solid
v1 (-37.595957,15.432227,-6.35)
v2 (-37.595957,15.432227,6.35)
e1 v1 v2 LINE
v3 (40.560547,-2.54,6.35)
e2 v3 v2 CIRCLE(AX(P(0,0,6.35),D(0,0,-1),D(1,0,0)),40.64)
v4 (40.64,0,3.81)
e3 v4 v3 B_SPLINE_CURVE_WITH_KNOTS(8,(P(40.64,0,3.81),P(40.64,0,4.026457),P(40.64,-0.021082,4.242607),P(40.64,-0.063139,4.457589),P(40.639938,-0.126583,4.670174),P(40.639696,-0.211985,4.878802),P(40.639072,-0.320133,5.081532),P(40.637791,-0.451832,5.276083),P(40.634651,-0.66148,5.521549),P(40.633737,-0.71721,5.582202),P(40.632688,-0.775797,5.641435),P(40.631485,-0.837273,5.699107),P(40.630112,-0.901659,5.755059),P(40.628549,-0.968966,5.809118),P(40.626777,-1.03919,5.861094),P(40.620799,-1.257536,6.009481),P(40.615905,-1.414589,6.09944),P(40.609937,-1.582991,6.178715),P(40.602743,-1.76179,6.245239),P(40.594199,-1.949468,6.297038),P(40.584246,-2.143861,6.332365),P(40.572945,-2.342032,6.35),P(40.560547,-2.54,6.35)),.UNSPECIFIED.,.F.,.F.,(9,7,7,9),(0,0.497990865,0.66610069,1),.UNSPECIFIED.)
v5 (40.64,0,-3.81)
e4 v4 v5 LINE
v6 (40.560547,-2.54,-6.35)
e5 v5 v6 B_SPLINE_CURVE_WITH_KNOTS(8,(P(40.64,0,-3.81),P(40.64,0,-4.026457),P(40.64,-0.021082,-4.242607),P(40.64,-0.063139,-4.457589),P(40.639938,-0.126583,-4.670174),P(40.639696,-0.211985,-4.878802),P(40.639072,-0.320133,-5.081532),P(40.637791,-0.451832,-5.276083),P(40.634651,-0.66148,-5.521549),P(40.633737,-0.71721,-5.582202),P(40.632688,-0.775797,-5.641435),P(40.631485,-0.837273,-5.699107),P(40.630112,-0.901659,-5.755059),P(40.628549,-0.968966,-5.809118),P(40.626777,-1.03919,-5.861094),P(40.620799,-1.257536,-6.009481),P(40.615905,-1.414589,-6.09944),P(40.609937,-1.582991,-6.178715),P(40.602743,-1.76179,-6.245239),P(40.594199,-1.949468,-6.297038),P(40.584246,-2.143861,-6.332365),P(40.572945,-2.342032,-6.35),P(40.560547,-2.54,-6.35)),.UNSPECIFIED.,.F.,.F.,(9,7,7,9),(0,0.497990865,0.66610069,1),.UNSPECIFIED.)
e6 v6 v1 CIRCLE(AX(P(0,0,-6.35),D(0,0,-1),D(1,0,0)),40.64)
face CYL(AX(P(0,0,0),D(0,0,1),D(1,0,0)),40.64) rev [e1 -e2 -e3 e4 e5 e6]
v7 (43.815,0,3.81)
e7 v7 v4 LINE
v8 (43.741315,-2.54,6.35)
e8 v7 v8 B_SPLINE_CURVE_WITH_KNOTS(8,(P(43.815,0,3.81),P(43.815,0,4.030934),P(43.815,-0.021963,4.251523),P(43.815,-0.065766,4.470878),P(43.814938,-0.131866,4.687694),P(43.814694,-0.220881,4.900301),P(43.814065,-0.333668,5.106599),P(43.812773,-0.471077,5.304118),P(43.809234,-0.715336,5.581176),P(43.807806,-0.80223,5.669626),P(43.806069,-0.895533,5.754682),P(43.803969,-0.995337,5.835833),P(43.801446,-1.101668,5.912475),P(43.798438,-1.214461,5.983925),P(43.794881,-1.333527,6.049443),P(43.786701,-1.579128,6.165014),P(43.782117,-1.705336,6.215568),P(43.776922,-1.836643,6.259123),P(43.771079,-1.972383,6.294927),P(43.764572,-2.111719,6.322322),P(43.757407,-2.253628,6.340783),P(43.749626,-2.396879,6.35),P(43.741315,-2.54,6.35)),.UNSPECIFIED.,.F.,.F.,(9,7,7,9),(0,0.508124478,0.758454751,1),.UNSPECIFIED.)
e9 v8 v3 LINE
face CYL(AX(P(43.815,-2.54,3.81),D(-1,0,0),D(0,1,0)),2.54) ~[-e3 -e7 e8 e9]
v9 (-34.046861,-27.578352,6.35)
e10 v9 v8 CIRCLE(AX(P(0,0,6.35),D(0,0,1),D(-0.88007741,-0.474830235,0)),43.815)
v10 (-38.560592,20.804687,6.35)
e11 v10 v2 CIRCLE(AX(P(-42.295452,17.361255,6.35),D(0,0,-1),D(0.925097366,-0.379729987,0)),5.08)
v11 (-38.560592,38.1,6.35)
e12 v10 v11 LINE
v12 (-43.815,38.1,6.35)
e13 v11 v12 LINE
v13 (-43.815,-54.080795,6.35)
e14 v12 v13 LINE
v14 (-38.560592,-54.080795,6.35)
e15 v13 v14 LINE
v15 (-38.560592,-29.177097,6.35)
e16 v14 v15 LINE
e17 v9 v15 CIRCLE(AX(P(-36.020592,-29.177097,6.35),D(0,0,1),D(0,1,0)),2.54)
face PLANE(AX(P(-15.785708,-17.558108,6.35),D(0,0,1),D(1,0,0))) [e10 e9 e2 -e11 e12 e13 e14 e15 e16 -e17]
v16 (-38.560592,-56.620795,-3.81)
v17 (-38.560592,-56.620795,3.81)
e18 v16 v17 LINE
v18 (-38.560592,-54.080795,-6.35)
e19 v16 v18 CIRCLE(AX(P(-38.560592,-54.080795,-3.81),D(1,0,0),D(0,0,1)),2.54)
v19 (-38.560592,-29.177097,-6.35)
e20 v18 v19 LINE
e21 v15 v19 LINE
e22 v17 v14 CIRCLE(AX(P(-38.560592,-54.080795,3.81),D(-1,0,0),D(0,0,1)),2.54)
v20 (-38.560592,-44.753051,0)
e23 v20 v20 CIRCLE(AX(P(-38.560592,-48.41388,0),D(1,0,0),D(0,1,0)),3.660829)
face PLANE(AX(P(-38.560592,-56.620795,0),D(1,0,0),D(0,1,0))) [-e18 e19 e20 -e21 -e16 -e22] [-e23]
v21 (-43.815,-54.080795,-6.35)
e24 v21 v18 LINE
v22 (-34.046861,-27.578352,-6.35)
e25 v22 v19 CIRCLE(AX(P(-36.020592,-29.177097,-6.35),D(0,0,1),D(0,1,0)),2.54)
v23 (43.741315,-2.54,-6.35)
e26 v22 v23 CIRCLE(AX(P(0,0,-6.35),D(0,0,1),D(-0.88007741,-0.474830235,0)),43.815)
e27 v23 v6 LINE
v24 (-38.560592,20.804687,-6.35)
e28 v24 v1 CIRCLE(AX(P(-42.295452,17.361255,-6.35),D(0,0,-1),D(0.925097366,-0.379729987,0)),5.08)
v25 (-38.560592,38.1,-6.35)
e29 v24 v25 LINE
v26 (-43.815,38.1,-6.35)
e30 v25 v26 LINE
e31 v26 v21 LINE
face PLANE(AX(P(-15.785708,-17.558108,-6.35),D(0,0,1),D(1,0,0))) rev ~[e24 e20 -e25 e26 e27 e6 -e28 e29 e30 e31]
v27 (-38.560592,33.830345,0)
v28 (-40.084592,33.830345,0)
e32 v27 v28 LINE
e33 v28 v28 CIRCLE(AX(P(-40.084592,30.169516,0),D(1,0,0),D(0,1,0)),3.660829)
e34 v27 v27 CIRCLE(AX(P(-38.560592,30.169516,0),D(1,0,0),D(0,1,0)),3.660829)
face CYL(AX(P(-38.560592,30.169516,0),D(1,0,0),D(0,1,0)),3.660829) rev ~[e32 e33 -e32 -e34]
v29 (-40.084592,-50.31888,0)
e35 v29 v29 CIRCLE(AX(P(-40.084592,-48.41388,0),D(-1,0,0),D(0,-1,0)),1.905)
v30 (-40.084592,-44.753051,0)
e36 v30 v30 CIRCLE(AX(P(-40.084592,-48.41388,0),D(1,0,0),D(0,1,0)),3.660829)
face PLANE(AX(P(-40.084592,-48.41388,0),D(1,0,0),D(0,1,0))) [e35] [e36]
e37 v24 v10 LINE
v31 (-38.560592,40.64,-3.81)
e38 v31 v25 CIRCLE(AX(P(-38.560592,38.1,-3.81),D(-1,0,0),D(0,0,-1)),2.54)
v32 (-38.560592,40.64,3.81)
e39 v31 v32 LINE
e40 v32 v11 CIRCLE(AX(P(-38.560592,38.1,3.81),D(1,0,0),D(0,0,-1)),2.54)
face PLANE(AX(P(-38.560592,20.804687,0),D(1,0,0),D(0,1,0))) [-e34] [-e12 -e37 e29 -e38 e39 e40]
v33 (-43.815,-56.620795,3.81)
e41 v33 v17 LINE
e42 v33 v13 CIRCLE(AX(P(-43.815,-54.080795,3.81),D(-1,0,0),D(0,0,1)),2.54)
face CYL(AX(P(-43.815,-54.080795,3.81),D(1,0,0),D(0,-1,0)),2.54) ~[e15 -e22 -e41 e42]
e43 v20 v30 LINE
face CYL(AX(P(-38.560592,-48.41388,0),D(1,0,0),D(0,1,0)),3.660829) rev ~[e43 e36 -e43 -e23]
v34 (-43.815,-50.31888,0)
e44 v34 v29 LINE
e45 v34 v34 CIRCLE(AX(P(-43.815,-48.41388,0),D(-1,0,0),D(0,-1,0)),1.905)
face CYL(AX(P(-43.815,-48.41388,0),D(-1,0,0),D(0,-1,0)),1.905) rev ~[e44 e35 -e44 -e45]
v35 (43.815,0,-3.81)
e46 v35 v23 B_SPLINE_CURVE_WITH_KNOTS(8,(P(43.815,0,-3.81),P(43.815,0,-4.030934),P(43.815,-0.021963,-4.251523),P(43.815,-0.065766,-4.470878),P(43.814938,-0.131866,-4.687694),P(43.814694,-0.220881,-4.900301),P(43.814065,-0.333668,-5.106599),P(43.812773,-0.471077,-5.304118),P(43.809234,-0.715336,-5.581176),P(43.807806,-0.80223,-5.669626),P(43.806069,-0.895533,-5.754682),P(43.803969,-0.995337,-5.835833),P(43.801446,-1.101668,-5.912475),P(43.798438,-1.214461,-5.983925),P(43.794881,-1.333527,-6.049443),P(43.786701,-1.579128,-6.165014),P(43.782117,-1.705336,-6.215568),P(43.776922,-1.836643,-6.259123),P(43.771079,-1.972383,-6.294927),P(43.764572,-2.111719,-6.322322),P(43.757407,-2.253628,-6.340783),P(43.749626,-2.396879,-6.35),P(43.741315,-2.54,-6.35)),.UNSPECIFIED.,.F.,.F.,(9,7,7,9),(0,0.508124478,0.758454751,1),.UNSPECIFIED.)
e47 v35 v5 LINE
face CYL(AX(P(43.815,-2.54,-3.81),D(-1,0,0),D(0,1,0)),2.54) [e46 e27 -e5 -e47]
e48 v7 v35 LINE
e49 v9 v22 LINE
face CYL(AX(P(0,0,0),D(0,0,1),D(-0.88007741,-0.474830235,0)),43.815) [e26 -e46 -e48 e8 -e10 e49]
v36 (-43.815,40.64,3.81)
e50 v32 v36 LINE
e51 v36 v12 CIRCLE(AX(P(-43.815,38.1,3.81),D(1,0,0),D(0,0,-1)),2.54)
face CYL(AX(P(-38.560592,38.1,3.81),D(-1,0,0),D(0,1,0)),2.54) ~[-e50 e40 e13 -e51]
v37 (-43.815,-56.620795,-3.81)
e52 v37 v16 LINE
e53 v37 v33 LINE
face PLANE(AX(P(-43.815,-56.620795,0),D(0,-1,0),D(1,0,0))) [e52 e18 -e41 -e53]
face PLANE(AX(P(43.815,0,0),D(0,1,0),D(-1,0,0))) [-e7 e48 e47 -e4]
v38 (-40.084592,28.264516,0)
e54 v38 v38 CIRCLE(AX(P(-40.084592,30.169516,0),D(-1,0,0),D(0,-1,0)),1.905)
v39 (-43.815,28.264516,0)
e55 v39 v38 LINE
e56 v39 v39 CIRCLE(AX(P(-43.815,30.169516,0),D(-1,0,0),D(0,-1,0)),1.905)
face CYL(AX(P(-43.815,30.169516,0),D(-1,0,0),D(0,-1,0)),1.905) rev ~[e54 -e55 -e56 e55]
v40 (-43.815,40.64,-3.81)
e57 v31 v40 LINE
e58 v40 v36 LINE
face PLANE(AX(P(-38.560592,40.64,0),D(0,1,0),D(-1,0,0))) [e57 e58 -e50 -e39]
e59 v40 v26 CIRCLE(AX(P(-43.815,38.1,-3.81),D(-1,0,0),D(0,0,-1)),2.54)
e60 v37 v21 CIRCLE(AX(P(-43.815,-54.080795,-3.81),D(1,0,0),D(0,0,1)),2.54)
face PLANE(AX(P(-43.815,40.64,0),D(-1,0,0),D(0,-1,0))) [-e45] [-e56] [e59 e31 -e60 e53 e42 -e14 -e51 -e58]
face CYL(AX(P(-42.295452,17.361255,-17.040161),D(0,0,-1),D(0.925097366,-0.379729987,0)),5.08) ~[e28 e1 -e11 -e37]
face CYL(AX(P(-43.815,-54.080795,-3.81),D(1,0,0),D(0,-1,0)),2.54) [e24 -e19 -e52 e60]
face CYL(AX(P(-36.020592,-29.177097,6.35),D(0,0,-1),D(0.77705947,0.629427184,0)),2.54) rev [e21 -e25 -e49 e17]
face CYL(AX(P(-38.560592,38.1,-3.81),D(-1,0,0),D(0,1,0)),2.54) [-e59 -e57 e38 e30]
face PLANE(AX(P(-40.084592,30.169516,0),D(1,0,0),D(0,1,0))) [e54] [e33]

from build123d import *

# Parameters (mm, degrees)
F1_DEPTH    = 6.35
F2_R        = 2.54
F3_R        = 1.905
F4_DEPTH    = 25.4
F5_R        = 3.6608290009
F6_DEPTH    = 1.524
F7_T1_DEPTH = 34.0803226462


# Not quite as in the source:
# - a fillet or chamfer that OpenCascade refuses, or shapes differently, is made with other operations: its cross-section is extruded or revolved along the edge and cut away or added
# - a feature names something its author has since deleted; it is built from what else it names


with BuildPart() as f1:
    # F0 (on Top) → F1 (new body, symmetric)
    with BuildSketch(Plane.XY):
        with BuildLine():
            ThreePointArc((40.64, 0), (-9.9515149654, -39.402753075), (-35.7663459593, 19.2971007335))
            Line((-35.7663459593, 19.2971007335), (-38.5605917374, 20.8046867283))
            Line((-38.5605917374, 20.8046867283), (-38.5605917374, 40.64))
            Line((-38.5605917374, 40.64), (-43.815, 40.64))
            Line((-43.815, 40.64), (-43.815, -43.815))
            Line((-43.815, -43.815), (-43.815, -56.6207952306))
            Line((-43.815, -56.6207952306), (-38.5605917374, -56.6207952306))
            Line((-38.5605917374, -56.6207952306), (-38.5605917374, -43.815))
            Line((-38.5605917374, -43.815), (-38.5605917374, -20.8046867283))
            ThreePointArc((-38.5605917374, -20.8046867283), (10.7289770721, -42.481093159), (43.815, 0))
            Line((43.815, 0), (40.64, 0))
        make_face()
    extrude(amount=F1_DEPTH, both=True)

    # F2
    f2_edges = [f1.edges().sort_by_distance(p)[0] for p in [
        (42.2275, 0, 6.35),
        (42.2275, 0, -6.35),
        (-38.560592, -20.804687, 0),
        (-41.187796, 40.64, 6.35),
        (-41.187796, 40.64, -6.35),
        (-41.187796, -56.620795, 6.35),
        (-41.187796, -56.620795, -6.35),
    ]]
    fillet(f2_edges, radius=F2_R)

    # F3 (on face) → F4 (cut)
    with BuildSketch(Plane(origin=(-43.815, 0, 0), x_dir=(0, -1, 0), z_dir=(-1, 0, 0))):
        with Locations((-30.1695157966, 0)):
            Circle(F3_R)
        with Locations((48.4138801694, 0)):
            Circle(F3_R)
    extrude(amount=-F4_DEPTH, mode=Mode.SUBTRACT)

    # F5 (on face) → F6 (cut)
    with BuildSketch(Plane.YZ.offset(-38.5605917374)):
        with Locations((30.1695157966, 0)):
            Circle(F5_R)
        with Locations((-48.4138801694, 0)):
            Circle(F5_R)
    extrude(amount=-F6_DEPTH, mode=Mode.SUBTRACT)

    # F7: fillet of radius 5.08 on 1 edges, made by hand

    # F7_s2 → F7_t1 (cut)
    with BuildSketch(Plane.XY.offset(-17.0401613231)):
        with BuildLine():
            ThreePointArc((-37.5959569593, 15.4322266804), (-37.2954100255, 18.259021389), (-38.5605917374, 20.8046867283))
            Line((-38.5605917374, 20.8046867283), (-35.7663459593, 19.2971007335))
            ThreePointArc((-35.7663459593, 19.2971007335), (-36.7320185294, 17.3887439097), (-37.5959569593, 15.4322266804))
        make_face()
    extrude(amount=F7_T1_DEPTH, mode=Mode.SUBTRACT)


solid = f1.part
